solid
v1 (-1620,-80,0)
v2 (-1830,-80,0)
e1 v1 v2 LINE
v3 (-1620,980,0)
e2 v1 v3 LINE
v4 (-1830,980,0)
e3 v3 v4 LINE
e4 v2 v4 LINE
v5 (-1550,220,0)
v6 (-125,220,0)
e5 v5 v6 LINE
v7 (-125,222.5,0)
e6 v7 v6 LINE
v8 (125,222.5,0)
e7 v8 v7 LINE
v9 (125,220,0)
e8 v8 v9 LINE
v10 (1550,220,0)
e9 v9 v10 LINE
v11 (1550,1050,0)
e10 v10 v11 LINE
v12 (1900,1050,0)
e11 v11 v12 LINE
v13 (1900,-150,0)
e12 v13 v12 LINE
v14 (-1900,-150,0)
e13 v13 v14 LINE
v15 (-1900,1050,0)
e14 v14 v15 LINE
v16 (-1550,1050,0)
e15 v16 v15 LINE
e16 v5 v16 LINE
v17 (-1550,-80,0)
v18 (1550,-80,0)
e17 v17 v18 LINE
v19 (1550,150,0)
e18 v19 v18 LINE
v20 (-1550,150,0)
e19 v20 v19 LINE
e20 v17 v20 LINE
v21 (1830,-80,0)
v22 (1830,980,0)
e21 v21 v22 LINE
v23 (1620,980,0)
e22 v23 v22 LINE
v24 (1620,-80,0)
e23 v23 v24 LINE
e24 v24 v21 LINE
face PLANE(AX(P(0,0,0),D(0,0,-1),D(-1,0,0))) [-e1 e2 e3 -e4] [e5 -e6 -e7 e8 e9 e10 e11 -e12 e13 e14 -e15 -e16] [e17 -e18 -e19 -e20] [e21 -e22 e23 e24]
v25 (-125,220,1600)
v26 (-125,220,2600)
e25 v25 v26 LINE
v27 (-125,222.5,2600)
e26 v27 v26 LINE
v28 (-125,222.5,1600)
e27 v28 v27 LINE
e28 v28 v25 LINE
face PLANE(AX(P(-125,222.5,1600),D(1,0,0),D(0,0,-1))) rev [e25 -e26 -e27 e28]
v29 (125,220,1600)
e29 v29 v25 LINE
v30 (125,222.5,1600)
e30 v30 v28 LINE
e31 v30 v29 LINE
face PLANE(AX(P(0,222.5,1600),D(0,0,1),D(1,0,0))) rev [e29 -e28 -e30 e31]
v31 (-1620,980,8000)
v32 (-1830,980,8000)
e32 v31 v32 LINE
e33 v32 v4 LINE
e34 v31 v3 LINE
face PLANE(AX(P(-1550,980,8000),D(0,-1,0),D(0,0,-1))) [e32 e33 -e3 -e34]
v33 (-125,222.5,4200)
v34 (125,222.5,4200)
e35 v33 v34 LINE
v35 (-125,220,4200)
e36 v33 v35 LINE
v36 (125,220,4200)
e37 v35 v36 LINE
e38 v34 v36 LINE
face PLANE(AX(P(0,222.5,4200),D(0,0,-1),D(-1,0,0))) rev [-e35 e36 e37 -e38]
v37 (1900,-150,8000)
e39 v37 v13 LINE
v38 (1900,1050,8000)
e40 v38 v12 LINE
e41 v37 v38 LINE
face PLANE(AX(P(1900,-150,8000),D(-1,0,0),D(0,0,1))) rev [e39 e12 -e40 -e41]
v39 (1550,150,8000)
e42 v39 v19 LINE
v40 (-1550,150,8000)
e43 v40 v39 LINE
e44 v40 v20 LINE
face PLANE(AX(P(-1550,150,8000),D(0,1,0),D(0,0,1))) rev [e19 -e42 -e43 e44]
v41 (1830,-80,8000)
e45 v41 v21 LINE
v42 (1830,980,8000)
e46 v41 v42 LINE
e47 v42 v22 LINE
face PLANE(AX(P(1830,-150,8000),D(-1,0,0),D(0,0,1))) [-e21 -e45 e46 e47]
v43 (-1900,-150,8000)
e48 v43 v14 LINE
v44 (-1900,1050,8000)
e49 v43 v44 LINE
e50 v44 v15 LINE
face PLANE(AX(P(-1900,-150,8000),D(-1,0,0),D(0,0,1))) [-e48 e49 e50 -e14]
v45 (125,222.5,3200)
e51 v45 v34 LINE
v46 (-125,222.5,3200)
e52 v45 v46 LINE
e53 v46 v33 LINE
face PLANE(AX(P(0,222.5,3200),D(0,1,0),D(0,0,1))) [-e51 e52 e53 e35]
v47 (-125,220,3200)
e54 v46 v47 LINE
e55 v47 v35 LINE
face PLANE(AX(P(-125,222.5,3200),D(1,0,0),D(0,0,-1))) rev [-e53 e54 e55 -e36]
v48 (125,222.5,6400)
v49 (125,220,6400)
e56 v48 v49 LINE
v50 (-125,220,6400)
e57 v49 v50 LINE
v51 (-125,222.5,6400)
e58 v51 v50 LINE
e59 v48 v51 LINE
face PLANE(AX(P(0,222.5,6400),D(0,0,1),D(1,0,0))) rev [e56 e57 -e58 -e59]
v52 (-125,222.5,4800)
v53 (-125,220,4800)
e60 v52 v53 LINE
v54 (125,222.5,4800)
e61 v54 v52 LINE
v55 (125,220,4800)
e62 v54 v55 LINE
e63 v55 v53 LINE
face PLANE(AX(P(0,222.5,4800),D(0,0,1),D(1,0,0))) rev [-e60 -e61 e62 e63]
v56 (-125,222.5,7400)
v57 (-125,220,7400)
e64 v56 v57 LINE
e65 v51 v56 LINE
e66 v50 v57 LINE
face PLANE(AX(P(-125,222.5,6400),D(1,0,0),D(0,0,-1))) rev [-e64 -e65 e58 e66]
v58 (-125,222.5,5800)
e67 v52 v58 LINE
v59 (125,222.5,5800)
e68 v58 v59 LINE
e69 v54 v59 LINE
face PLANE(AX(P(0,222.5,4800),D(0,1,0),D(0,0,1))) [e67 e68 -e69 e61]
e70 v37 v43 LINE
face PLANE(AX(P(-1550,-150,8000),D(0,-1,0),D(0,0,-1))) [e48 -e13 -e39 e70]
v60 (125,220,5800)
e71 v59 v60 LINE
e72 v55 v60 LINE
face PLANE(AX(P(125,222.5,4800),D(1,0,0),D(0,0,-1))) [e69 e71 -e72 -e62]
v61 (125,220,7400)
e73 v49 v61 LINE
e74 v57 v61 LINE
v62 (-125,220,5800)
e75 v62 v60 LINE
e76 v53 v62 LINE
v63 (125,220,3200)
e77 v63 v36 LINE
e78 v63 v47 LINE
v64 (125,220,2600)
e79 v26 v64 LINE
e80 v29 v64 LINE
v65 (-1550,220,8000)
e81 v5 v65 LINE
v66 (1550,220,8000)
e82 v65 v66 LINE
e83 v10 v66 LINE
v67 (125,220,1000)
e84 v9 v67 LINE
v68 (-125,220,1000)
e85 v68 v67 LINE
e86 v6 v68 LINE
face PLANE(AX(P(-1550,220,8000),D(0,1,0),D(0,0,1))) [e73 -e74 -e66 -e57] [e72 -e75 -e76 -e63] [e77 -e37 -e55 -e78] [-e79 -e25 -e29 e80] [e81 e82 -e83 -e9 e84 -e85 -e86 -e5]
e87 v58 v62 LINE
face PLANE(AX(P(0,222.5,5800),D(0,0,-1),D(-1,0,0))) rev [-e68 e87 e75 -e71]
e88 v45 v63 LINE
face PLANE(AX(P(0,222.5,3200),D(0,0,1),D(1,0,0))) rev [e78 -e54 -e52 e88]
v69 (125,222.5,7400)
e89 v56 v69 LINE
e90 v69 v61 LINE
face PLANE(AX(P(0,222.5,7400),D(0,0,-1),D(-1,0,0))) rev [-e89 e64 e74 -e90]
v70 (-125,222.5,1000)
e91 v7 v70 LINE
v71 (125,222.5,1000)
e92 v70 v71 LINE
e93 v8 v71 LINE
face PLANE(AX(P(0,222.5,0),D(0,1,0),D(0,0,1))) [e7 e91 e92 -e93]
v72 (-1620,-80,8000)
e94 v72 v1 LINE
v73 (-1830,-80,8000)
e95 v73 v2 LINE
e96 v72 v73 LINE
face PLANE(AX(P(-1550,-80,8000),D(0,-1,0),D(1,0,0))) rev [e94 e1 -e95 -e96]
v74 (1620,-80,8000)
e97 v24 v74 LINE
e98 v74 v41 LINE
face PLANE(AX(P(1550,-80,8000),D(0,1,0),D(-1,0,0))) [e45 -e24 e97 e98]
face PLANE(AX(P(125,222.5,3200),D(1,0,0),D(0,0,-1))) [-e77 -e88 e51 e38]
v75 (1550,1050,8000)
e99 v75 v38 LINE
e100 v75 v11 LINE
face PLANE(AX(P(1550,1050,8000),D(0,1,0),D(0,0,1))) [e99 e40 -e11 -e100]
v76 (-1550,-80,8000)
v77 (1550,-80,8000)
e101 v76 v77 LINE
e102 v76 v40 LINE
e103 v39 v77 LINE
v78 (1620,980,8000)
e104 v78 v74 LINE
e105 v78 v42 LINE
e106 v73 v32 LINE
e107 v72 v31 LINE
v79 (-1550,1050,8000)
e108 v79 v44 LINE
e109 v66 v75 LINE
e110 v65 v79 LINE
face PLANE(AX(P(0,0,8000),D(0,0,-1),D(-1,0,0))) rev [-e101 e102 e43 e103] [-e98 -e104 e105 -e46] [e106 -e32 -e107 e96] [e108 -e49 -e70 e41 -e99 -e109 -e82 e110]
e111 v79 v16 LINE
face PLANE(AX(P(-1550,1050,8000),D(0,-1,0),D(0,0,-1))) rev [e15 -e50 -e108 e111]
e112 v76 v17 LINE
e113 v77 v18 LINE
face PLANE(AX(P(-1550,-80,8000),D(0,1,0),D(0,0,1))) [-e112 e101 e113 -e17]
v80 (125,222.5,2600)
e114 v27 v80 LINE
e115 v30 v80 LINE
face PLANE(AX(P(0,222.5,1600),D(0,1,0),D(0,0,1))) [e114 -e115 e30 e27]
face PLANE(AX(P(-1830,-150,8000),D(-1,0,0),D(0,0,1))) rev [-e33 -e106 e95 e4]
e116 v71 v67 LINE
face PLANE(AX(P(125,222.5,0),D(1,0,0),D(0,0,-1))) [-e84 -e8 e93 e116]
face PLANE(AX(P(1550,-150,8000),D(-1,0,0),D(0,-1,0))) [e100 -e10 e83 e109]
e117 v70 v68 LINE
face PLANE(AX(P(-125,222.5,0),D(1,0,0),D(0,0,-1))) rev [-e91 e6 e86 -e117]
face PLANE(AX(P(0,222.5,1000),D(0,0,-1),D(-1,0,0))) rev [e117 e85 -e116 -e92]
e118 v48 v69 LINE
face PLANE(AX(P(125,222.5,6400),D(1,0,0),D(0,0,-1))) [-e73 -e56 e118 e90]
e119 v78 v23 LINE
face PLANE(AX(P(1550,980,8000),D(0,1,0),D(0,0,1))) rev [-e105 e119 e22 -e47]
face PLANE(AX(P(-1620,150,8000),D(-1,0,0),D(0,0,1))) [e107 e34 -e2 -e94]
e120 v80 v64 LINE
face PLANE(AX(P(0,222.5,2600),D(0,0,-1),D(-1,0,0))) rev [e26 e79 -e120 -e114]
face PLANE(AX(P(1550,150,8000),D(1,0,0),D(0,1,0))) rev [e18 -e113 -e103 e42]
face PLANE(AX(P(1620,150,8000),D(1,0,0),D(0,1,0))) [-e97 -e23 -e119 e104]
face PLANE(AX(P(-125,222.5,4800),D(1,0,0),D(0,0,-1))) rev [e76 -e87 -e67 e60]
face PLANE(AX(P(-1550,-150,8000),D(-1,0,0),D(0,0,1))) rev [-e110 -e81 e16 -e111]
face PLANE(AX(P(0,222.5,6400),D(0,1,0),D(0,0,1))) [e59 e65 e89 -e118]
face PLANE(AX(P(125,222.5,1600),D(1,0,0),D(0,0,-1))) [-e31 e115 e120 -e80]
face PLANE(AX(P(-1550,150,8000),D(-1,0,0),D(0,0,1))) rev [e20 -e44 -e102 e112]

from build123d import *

# Parameters (mm, degrees)
EXTRUDE_THIN1_OUTLINE_W   = 3100
EXTRUDE_THIN1_OUTLINE_H   = 230
EXTRUDE_THIN1_OUTLINE_W_2 = 210
EXTRUDE_THIN1_OUTLINE_H_2 = 1060
EXTRUDE_THIN1_DEPTH       = 8000
SKETCH4_W                 = 250
SKETCH4_H                 = 1000
BOSS_EXTRUDE2_DEPTH       = 2.5
LPATTERN1_COUNT           = 5
LPATTERN1_PITCH           = 1600


# Read off the part's stored shape, not the designer's step: Extrude-Thin1
with BuildPart() as part:
    # Extrude-Thin1 outline → Extrude-Thin1 (new body)
    with BuildSketch(Plane.XY):
        Polygon((-1900, 1050), (-1900, -150), (1900, -150), (1900, 1050), (1550, 1050), (1550, 220), (-1550, 220), (-1550, 1050), align=None)
        with Locations((0, 35)):
            Rectangle(EXTRUDE_THIN1_OUTLINE_W, EXTRUDE_THIN1_OUTLINE_H, mode=Mode.SUBTRACT)
        with Locations((-1725, 450)):
            Rectangle(EXTRUDE_THIN1_OUTLINE_W_2, EXTRUDE_THIN1_OUTLINE_H_2, mode=Mode.SUBTRACT)
        with Locations((1725, 450)):
            Rectangle(EXTRUDE_THIN1_OUTLINE_W_2, EXTRUDE_THIN1_OUTLINE_H_2, mode=Mode.SUBTRACT)
    extrude(amount=EXTRUDE_THIN1_DEPTH)

    # Sketch4 → Boss-Extrude2 (add)
    with BuildSketch(Plane(origin=(0, 220, 0), x_dir=(1, 0, 0), z_dir=(0, 1, 0))):
        with Locations((0, -500)):
            Rectangle(SKETCH4_W, SKETCH4_H)
    boss_extrude2 = extrude(amount=BOSS_EXTRUDE2_DEPTH)

    # LPattern1: Boss-Extrude2 ×5
    with Locations(*[(0, 0, i * LPATTERN1_PITCH) for i in range(1, LPATTERN1_COUNT)]):
        add(boss_extrude2)


solid = part.part
